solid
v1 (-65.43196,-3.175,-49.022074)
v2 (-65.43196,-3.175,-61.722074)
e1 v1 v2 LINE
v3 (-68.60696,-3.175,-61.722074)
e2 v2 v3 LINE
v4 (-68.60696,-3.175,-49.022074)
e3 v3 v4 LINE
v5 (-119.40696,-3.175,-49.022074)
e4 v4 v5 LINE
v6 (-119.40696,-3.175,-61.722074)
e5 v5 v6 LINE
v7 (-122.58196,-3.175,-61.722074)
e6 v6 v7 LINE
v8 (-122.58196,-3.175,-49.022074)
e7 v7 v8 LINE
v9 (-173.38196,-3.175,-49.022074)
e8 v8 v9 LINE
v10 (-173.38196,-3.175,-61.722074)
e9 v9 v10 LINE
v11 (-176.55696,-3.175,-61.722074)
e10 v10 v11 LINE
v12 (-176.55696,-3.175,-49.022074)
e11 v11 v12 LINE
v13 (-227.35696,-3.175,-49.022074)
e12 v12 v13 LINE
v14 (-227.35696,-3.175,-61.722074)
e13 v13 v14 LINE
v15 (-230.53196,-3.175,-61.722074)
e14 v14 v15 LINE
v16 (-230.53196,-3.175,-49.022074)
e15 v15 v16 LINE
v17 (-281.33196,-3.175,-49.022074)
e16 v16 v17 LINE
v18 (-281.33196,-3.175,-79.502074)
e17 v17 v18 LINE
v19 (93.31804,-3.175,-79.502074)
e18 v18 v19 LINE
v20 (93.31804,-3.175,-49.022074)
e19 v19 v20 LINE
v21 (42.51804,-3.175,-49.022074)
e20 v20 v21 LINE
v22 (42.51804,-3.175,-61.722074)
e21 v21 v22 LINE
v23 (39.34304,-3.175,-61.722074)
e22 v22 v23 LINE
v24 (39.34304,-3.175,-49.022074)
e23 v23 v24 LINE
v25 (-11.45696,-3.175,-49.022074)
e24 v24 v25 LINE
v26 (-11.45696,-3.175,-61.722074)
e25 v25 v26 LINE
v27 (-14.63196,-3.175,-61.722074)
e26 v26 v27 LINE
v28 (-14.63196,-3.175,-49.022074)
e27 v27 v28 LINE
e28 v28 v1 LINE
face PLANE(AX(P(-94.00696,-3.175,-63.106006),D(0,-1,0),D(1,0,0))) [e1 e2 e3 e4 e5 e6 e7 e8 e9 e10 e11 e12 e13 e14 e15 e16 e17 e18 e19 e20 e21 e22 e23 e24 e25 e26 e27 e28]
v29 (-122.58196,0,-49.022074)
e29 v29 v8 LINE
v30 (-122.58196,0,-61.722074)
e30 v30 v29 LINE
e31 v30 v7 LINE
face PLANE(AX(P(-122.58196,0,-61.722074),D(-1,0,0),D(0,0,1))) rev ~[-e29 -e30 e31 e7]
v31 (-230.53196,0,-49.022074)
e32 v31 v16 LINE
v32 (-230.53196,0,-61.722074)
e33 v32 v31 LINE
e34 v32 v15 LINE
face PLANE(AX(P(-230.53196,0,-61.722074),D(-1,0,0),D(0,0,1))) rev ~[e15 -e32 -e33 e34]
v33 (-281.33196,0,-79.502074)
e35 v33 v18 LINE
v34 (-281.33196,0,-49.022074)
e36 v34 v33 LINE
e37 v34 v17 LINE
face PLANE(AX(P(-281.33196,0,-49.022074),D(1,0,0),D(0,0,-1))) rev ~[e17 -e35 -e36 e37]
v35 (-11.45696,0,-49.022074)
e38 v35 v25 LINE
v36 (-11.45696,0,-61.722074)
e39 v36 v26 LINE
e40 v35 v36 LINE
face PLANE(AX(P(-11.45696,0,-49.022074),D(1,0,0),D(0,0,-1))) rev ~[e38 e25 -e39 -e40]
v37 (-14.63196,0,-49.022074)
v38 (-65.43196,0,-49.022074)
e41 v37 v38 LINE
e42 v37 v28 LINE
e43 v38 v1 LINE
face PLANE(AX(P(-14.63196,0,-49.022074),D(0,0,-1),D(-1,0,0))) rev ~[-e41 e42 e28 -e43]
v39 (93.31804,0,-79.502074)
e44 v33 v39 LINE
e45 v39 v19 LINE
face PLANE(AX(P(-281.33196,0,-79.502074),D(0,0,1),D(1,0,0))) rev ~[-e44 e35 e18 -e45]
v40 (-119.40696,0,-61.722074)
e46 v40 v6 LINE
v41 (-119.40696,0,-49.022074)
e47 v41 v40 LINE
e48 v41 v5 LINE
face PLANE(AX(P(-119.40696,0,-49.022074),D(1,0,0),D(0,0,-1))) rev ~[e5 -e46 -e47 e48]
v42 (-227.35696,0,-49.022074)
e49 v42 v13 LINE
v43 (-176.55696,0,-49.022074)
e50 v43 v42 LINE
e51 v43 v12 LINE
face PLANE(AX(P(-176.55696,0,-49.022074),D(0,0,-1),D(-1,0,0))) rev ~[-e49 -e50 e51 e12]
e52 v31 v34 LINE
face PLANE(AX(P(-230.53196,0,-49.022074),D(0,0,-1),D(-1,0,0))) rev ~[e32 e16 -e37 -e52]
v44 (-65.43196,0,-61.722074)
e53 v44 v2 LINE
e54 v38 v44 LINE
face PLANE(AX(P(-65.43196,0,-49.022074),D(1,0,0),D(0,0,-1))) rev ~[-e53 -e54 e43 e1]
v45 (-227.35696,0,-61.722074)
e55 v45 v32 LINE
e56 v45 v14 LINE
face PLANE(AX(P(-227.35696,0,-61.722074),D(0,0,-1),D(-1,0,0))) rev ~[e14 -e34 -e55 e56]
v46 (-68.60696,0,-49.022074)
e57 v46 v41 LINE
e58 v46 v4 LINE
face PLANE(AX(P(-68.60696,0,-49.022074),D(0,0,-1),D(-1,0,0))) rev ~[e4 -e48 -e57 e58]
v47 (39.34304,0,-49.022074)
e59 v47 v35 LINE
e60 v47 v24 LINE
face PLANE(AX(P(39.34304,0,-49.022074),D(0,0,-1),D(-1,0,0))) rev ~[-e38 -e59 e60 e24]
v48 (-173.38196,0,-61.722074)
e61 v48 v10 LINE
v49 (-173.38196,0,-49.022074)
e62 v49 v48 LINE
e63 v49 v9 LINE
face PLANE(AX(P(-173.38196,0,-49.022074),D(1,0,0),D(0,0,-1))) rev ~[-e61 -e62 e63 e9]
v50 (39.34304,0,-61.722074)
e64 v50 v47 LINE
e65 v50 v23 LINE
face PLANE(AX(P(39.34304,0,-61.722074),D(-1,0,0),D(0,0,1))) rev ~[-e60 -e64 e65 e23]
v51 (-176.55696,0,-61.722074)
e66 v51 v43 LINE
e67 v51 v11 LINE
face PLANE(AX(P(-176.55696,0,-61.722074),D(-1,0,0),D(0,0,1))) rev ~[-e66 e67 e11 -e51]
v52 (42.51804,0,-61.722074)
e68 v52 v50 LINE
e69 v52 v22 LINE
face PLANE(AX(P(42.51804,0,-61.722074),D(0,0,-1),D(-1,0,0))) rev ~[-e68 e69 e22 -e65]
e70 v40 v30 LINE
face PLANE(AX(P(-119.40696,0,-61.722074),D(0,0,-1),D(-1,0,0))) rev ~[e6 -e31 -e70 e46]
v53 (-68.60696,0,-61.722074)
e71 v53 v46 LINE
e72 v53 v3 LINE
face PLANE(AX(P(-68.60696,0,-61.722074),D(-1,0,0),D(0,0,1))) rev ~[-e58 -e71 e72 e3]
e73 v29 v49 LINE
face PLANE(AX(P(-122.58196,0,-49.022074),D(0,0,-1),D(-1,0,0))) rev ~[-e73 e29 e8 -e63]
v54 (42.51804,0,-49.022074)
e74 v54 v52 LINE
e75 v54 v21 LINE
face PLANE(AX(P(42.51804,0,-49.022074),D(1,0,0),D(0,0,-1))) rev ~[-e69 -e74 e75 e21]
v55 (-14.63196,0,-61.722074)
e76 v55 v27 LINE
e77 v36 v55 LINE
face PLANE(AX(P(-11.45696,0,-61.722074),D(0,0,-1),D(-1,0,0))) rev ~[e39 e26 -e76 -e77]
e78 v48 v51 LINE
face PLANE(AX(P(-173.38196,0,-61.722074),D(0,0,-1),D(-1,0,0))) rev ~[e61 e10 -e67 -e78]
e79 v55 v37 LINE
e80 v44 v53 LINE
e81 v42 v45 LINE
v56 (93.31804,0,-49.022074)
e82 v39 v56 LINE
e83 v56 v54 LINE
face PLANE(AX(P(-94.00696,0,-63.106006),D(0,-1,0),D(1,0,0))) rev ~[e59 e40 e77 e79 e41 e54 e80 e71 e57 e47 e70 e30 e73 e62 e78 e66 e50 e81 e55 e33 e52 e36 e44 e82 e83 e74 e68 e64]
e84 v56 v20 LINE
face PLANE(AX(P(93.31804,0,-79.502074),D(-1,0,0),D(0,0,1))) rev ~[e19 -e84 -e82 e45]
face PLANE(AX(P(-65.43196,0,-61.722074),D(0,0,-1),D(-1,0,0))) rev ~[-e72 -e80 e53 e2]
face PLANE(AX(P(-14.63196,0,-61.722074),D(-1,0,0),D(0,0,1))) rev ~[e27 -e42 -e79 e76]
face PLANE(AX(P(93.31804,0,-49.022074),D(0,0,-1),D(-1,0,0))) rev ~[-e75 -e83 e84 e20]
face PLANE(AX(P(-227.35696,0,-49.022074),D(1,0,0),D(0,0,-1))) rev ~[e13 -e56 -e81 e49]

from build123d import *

# Parameters (mm, degrees)
F1_DEPTH = 3.175


# Not quite as in the source:
# - a length typed as a fraction of an inch, garbled in the dataset ("3 / 203.2 mm" for 3/8 in), is restored


with BuildPart() as f1:
    # F0 (on Front) → F1 (new body)
    with BuildSketch(Plane.XZ):
        Polygon((-230.5319600344, -49.02207428), (-281.3319600344, -49.02207428), (-281.3319600344, -79.50207428), (93.3180399656, -79.50207428), (93.3180399656, -61.72207428), (93.3180399656, -49.02207428), (42.5180399656, -49.02207428), (42.5180399656, -61.72207428), (39.3430399656, -61.72207428), (39.3430399656, -49.02207428), (-11.4569600344, -49.02207428), (-11.4569600344, -61.72207428), (-14.6319600344, -61.72207428), (-14.6319600344, -49.02207428), (-65.4319600344, -49.02207428), (-65.4319600344, -61.72207428), (-68.6069600344, -61.72207428), (-68.6069600344, -49.02207428), (-119.4069600344, -49.02207428), (-119.4069600344, -61.72207428), (-122.5819600344, -61.72207428), (-122.5819600344, -49.02207428), (-173.3819600344, -49.02207428), (-173.3819600344, -61.72207428), (-176.5569600344, -61.72207428), (-176.5569600344, -49.02207428), (-227.3569600344, -49.02207428), (-227.3569600344, -61.72207428), (-230.5319600344, -61.72207428), align=None)
    extrude(amount=F1_DEPTH)


solid = f1.part
